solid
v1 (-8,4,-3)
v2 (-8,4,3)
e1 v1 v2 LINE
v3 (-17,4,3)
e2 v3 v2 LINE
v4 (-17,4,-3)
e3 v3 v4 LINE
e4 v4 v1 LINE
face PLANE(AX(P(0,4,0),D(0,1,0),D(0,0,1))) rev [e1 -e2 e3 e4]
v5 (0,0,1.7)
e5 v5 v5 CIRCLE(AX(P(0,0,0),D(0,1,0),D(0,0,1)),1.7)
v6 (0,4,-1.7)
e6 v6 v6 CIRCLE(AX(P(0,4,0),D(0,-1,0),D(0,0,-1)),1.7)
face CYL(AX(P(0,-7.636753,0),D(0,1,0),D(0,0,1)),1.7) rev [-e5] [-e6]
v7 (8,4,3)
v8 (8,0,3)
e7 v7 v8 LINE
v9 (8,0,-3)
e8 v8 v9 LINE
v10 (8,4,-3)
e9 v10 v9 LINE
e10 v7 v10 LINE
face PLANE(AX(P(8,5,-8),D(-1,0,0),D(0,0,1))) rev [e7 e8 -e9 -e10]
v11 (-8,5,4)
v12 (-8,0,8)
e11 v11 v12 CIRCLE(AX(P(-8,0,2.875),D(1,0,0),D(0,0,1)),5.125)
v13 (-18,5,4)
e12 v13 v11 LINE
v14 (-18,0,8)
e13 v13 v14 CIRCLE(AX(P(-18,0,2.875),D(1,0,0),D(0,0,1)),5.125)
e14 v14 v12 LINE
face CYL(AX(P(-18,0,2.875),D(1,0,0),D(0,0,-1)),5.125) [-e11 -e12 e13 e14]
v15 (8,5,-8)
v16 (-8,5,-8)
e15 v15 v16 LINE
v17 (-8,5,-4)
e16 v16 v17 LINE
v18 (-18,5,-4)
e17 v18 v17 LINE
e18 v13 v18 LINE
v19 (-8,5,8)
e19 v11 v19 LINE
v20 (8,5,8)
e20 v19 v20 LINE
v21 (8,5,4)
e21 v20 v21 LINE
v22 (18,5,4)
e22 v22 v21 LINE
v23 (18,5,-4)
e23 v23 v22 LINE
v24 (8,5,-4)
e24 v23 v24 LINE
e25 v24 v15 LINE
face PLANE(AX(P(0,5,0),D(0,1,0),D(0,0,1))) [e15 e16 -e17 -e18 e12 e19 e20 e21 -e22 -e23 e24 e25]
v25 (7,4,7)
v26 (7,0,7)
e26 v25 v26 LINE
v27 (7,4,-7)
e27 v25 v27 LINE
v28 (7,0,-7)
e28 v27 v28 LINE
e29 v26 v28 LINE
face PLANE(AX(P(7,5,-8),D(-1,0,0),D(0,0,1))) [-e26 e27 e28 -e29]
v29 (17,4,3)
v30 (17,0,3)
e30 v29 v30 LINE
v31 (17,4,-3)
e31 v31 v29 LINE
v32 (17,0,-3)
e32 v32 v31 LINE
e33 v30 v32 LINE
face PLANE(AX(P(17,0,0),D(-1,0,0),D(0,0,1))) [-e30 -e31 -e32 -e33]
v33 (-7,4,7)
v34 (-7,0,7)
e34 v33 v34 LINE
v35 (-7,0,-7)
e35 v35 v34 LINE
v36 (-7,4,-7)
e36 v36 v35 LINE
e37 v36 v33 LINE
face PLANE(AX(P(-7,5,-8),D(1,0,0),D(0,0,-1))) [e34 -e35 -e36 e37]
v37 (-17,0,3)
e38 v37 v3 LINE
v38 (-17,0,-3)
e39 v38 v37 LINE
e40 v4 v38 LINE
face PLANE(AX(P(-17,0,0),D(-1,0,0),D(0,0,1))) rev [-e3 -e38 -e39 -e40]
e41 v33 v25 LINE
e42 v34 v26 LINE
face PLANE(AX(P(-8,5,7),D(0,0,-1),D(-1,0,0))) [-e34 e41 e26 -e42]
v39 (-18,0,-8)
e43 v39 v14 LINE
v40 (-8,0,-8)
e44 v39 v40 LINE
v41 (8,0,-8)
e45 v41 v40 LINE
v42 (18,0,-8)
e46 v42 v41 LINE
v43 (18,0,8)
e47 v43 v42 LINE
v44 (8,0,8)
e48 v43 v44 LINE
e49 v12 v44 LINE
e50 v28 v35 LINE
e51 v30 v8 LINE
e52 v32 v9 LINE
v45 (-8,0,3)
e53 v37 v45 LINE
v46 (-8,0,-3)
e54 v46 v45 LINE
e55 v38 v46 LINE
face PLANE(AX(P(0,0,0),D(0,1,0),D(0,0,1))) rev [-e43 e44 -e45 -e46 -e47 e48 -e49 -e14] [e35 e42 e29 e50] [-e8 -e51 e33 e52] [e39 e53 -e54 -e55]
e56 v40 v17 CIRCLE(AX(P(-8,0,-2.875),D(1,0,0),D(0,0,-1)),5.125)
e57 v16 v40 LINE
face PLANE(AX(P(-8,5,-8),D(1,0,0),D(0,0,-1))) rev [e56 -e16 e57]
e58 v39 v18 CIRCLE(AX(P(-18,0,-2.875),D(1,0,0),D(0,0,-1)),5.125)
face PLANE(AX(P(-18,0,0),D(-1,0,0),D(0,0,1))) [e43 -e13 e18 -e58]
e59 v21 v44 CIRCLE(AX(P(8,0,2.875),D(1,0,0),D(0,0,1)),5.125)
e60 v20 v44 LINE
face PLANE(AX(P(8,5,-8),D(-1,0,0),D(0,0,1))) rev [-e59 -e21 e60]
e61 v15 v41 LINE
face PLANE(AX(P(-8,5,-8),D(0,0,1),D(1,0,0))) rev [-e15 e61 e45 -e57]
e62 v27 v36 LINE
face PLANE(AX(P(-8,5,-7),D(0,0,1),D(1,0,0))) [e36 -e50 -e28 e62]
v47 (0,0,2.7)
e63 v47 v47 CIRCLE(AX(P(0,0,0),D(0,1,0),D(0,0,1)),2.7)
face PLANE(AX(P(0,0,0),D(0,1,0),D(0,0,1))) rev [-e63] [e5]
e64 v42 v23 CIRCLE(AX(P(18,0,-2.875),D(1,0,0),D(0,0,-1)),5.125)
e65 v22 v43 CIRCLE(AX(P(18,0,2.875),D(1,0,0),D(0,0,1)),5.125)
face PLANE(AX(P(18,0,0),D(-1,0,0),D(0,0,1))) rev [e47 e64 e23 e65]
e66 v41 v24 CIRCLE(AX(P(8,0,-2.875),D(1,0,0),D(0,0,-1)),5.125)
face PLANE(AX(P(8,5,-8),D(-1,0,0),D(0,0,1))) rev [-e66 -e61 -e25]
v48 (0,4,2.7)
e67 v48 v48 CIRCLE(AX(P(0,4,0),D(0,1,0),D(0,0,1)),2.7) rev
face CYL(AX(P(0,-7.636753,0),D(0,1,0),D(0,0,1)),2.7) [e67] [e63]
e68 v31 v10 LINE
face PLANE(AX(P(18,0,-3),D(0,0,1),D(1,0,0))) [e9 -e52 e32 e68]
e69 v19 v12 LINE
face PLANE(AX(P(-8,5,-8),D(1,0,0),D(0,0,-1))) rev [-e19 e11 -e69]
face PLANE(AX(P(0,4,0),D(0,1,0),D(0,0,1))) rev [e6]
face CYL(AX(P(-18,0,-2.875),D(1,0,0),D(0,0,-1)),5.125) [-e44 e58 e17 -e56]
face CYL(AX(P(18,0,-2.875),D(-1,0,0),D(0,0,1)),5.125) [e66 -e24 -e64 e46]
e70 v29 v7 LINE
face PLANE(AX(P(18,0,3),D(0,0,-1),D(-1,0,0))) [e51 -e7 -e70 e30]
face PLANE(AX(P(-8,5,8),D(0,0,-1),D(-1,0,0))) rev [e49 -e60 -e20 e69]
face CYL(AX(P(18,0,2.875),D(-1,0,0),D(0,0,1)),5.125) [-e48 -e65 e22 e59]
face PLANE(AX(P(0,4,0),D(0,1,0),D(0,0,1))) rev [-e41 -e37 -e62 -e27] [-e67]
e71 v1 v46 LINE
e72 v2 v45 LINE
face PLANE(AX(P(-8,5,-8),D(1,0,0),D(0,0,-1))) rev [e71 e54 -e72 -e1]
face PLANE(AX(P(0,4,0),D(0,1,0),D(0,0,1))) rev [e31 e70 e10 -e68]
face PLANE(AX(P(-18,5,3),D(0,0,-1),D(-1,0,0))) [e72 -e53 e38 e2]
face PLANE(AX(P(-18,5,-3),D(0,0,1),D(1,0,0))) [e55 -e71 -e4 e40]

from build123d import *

# Parameters (mm, degrees)
SKETCH1_W           = 16
SKETCH1_H           = 16
BOSS_EXTRUDE1_DEPTH = 5
SHELL1_T            = -1
SKETCH2_R           = 2.7
SKETCH2_R_2         = 1.7
BOSS_EXTRUDE2_DEPTH = 4
SKETCH3_W           = 8
SKETCH3_H           = 5
BOSS_EXTRUDE3_DEPTH = 10
SKETCH4_W           = 8
SKETCH4_H           = 5
BOSS_EXTRUDE4_DEPTH = 10
SHELL2_START        = -17
SHELL2_OUTLINE_W    = 4
SHELL2_OUTLINE_H    = 6
SHELL2_DEPTH        = 9
SHELL2_START_2      = 8
SHELL2_2_OUTLINE_W  = 4
SHELL2_2_OUTLINE_H  = 6
SHELL2_2_DEPTH      = 9
BOSS_EXTRUDE5_DEPTH = 10


# Read off the part's stored shape, not the designer's step: Shell2
with BuildPart() as part:
    # Sketch1 → Boss-Extrude1 (new body)
    with BuildSketch(Plane(origin=(0, 0, 0), x_dir=(1, 0, 0), z_dir=(0, 1, 0))):
        Rectangle(SKETCH1_W, SKETCH1_H)
    extrude(amount=BOSS_EXTRUDE1_DEPTH)

    # Shell1
    shell1_openings = [part.faces().sort_by_distance(p)[0] for p in [
        (0, 0, 0),
    ]]
    offset(amount=SHELL1_T, openings=shell1_openings, kind=Kind.INTERSECTION)

    # Sketch2 → Boss-Extrude2 (add)
    with BuildSketch(Plane.XZ.offset(-4)):
        with Locations(Location((0, 0, 0), (0, 0, 90))):
            Circle(SKETCH2_R)
        with Locations(Location((0, 0, 0), (0, 0, 90))):
            Circle(SKETCH2_R_2, mode=Mode.SUBTRACT)
    extrude(amount=BOSS_EXTRUDE2_DEPTH)

    # Sketch3 → Boss-Extrude3 (add)
    with BuildSketch(Plane.ZY.offset(8)):
        with Locations((0, 2.5)):
            Rectangle(SKETCH3_W, SKETCH3_H)
    extrude(amount=BOSS_EXTRUDE3_DEPTH)

    # Sketch4 → Boss-Extrude4 (add)
    with BuildSketch(Plane(origin=(8, 0, 0), x_dir=(0, 0, -1), z_dir=(1, 0, 0))):
        with Locations((0, 2.5)):
            Rectangle(SKETCH4_W, SKETCH4_H)
    extrude(amount=BOSS_EXTRUDE4_DEPTH)

    # Shell2 outline → Shell2 (cut)
    with BuildSketch(Plane.YZ.offset(SHELL2_START)):
        with Locations((2, 0)):
            Rectangle(SHELL2_OUTLINE_W, SHELL2_OUTLINE_H)
    extrude(amount=SHELL2_DEPTH, mode=Mode.SUBTRACT)

    # Shell2 2 outline → Shell2 2 (cut)
    with BuildSketch(Plane.YZ.offset(SHELL2_START_2)):
        with Locations((2, 0)):
            Rectangle(SHELL2_2_OUTLINE_W, SHELL2_2_OUTLINE_H)
    extrude(amount=SHELL2_2_DEPTH, mode=Mode.SUBTRACT)

    # Sketch5 → Boss-Extrude5 (add)
    with BuildSketch(Plane(origin=(8, 0, 0), x_dir=(0, 0, -1), z_dir=(1, 0, 0))):
        with BuildLine():
            Line((4, 0), (8, 0))
            ThreePointArc((8, 0), (6.876952648, 3.201562119), (4, 5))
            Line((4, 5), (4, 0))
        make_face()
        with BuildLine():
            Line((-4, 0), (-8, 0))
            ThreePointArc((-8, 0), (-6.876952648, 3.201562119), (-4, 5))
            Line((-4, 5), (-4, 0))
        make_face()
    boss_extrude5 = extrude(amount=BOSS_EXTRUDE5_DEPTH)

    # Mirror2: Boss-Extrude5 across plane
    add(boss_extrude5.mirror(Plane(origin=(0, 0, 0), x_dir=(0, 0, 1), z_dir=(1, 0, 0))))


solid = part.part
